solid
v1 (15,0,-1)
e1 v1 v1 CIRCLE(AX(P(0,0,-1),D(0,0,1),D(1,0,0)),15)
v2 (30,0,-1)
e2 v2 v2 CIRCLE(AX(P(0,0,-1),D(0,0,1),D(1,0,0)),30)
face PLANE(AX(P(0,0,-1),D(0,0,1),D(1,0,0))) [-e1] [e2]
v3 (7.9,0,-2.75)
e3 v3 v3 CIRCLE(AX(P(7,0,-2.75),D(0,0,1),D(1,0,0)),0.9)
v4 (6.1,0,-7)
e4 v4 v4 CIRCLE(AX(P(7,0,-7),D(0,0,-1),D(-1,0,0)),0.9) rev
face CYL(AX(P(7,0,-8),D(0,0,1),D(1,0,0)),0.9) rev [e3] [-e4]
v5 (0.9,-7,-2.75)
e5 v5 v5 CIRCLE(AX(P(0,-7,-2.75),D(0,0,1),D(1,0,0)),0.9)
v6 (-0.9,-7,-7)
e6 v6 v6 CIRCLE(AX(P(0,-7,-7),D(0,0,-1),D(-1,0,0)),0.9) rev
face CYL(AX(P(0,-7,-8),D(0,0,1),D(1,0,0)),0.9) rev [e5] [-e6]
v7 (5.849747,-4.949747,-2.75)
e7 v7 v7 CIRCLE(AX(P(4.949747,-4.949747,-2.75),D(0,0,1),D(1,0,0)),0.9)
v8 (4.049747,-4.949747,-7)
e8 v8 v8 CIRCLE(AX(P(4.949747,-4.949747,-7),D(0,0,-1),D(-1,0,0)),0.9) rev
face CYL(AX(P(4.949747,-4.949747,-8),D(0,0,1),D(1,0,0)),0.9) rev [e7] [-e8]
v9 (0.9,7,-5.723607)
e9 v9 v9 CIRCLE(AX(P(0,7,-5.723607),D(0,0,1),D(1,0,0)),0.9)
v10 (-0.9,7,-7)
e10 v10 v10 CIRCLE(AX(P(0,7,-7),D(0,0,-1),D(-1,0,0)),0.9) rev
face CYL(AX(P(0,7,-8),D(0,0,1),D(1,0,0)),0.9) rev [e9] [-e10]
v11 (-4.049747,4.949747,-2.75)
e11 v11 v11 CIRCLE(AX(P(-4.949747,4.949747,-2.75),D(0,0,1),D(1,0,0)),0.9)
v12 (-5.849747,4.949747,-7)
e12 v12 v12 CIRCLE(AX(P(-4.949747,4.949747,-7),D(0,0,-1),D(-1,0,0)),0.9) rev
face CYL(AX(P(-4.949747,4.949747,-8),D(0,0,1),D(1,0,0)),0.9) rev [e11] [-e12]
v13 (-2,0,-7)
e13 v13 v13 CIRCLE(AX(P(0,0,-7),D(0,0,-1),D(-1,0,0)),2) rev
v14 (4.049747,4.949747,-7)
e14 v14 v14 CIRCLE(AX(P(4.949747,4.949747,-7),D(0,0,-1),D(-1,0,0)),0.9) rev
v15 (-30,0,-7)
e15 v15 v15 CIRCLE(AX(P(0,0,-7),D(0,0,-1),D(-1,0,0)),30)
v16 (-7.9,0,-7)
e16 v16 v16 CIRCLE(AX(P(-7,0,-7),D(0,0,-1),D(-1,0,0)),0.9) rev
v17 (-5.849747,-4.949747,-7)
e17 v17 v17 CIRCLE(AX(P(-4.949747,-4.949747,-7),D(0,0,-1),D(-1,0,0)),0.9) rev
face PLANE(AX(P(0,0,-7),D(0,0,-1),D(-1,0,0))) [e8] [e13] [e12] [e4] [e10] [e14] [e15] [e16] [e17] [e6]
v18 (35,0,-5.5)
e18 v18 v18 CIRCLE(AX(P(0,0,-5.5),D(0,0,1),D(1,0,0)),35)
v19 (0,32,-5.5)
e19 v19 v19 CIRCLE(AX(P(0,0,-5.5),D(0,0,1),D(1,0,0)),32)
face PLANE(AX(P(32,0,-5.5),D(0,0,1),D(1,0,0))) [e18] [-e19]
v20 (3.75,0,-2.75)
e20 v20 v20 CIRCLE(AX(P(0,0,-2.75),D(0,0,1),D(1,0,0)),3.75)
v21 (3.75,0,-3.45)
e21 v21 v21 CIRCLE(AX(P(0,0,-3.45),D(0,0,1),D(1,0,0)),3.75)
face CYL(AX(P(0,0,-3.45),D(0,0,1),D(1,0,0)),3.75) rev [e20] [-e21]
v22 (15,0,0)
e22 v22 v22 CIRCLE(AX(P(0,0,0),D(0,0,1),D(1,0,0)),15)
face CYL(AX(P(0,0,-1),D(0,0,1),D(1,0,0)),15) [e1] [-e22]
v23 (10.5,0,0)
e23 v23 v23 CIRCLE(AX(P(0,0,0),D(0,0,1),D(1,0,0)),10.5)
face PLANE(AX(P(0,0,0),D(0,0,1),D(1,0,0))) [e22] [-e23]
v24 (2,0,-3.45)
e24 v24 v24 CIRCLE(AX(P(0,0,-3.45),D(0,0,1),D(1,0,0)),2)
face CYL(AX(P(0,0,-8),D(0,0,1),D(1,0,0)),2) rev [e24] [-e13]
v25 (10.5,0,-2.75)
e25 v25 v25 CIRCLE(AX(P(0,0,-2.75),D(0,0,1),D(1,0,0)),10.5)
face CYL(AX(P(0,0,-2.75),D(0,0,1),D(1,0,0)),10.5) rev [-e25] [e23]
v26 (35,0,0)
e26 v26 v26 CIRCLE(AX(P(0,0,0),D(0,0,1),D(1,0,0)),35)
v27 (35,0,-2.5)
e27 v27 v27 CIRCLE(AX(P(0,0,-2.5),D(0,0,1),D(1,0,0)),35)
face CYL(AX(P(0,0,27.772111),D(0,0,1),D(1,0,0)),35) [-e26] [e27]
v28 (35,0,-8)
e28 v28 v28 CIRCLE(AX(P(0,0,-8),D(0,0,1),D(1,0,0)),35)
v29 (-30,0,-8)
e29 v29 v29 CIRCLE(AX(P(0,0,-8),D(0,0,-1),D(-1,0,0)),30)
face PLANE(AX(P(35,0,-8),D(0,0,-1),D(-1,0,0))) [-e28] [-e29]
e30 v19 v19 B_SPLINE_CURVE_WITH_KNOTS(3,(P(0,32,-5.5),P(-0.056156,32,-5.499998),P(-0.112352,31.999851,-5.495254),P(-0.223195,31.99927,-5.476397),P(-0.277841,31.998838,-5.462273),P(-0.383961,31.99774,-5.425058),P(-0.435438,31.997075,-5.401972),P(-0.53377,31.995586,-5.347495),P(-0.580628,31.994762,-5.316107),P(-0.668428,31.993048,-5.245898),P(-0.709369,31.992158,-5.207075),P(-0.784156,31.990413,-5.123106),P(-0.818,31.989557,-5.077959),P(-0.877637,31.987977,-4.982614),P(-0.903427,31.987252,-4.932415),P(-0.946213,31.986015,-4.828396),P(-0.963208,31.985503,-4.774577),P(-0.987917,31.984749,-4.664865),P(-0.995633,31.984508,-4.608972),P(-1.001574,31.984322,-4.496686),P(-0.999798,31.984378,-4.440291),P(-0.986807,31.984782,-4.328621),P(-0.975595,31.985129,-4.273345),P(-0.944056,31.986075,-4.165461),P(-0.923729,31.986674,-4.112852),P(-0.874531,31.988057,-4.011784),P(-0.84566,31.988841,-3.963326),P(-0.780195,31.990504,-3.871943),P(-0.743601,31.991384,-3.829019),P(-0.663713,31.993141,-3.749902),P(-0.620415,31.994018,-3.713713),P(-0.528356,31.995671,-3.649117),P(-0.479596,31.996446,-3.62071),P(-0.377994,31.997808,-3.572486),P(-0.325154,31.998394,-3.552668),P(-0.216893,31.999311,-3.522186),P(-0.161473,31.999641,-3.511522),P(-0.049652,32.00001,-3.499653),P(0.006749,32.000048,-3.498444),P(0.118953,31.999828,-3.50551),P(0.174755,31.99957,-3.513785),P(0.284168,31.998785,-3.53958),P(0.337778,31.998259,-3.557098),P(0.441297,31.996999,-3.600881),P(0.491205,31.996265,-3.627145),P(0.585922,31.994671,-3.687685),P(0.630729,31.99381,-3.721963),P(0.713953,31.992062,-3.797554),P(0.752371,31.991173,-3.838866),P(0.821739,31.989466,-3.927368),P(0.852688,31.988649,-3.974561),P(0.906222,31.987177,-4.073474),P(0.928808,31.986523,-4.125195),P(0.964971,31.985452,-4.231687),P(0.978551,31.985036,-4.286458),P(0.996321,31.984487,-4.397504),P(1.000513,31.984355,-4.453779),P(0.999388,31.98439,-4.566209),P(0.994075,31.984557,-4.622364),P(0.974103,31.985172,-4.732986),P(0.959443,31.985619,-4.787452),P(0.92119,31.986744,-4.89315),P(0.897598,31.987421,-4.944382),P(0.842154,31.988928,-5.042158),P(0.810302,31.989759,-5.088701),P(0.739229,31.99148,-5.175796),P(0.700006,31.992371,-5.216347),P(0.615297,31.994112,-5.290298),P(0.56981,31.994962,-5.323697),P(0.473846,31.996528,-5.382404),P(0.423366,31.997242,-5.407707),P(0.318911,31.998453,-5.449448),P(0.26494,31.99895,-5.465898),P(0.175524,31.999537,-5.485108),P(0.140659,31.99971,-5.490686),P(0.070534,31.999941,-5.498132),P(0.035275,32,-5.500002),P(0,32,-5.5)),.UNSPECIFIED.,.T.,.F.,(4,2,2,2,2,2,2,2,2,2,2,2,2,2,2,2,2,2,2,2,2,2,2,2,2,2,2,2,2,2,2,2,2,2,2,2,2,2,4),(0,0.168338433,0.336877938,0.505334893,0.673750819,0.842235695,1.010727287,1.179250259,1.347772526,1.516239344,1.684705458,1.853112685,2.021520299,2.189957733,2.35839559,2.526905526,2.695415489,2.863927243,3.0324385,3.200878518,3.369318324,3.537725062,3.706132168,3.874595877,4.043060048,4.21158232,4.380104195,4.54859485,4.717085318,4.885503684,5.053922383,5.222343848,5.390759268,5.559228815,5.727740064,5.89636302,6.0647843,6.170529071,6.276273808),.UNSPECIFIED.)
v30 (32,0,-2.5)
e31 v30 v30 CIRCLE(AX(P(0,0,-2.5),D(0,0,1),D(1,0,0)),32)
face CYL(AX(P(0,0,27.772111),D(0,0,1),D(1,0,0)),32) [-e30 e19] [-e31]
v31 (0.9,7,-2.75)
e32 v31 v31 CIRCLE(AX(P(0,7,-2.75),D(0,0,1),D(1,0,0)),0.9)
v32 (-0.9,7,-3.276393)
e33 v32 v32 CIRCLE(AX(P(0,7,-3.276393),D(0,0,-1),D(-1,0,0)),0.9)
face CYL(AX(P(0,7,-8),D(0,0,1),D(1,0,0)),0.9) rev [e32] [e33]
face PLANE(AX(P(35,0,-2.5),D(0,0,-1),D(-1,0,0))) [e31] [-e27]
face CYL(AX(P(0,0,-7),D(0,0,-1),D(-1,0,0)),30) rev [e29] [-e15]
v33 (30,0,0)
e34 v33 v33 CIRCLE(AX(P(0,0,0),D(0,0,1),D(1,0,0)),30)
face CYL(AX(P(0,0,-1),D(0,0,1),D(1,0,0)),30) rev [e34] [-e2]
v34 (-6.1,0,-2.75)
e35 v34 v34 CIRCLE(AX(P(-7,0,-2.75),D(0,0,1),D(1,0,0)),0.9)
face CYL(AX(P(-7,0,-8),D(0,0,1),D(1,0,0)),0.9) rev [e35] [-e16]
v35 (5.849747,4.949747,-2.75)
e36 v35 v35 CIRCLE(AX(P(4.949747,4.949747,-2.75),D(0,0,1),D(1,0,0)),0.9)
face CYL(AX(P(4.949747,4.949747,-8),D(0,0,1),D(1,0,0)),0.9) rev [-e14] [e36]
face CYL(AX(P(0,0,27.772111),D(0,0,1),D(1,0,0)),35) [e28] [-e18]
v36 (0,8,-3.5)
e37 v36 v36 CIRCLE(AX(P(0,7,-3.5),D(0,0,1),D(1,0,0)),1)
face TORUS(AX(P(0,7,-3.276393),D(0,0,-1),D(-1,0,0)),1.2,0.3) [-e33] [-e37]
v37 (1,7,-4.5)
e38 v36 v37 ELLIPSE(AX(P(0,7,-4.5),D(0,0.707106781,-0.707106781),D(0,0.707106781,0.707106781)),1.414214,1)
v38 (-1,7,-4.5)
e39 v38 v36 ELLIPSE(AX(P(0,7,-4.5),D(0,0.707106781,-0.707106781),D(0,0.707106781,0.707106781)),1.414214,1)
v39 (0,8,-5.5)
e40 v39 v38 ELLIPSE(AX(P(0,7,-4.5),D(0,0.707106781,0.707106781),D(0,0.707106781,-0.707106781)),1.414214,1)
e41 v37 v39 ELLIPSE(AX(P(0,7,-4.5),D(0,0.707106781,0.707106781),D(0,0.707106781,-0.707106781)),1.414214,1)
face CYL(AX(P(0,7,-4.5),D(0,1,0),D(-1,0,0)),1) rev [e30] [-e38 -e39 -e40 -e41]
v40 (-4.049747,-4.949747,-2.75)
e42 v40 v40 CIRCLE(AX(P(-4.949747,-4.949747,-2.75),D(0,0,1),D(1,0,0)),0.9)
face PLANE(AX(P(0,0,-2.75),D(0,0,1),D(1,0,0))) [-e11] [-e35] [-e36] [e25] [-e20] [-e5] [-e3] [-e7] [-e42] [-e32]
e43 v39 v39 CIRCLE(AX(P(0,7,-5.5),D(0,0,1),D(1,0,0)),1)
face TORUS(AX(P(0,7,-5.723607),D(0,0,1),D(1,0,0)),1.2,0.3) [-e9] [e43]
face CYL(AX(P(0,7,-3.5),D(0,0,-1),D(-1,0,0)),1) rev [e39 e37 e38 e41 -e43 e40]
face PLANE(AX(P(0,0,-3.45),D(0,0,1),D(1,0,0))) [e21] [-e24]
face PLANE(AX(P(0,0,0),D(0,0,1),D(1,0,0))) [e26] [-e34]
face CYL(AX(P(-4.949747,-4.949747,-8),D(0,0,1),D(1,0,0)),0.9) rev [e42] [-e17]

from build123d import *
from build123d.topology import SkipClean

# Parameters (mm, degrees)
SKETCH4_R              = 10.5
CUT_EXTRUDE2_DEPTH     = 2.75
SKETCH5_R              = 3.75
CUT_EXTRUDE3_DEPTH     = 0.7
SKETCH6_R              = 0.9
CUT_EXTRUDE4_DEPTH     = 50.775119287
SKETCH11_R             = 2
CUT_EXTRUDE8_DEPTH     = 50.70616159
CUT_EXTRUDE9_START     = -25
CUT_EXTRUDE9_OUTLINE_R = 1
CUT_EXTRUDE9_DEPTH     = 26
SKETCH18_R             = 30
CUT_EXTRUDE12_DEPTH    = 1
CUT_EXTRUDE13_START    = -1
SKETCH19_R             = 30
SKETCH19_R_2           = 15
CUT_EXTRUDE13_DEPTH    = 1


with BuildPart() as part:
    # Sketch2 → Revolve1 (revolve)
    with BuildSketch(Plane(origin=(0, 0, 0), x_dir=(1, 0, 0), z_dir=(0, 1, 0))):
        Polygon((0, 0), (35, 0), (35, 2.5), (32, 2.5), (32, 5.5), (35, 5.5), (35, 8), (0, 8), align=None)
    revolve(axis=Axis((0, 0, 27.772111005), (0, 0, -1)))

    # Sketch4 → Cut-Extrude2 (cut)
    with BuildSketch(Plane.XY):
        Circle(SKETCH4_R)
    extrude(amount=-CUT_EXTRUDE2_DEPTH, mode=Mode.SUBTRACT)

    # Sketch5 → Cut-Extrude3 (cut)
    with BuildSketch(Plane.XY.offset(-2.75)):
        Circle(SKETCH5_R)
    extrude(amount=-CUT_EXTRUDE3_DEPTH, mode=Mode.SUBTRACT)

    # Sketch6 → Cut-Extrude4 (cut, through all)
    with BuildSketch(Plane.XY.offset(-2.75)):
        with Locations((0, 7)):
            Circle(SKETCH6_R)
        with Locations((4.949747468, 4.949747468)):
            Circle(SKETCH6_R)
        with Locations((7, 0)):
            Circle(SKETCH6_R)
        with Locations((4.949747468, -4.949747468)):
            Circle(SKETCH6_R)
        with Locations((0, -7)):
            Circle(SKETCH6_R)
        with Locations((-4.949747468, -4.949747468)):
            Circle(SKETCH6_R)
        with Locations((-7, 0)):
            Circle(SKETCH6_R)
        with Locations((-4.949747468, 4.949747468)):
            Circle(SKETCH6_R)
    extrude(amount=-CUT_EXTRUDE4_DEPTH, mode=Mode.SUBTRACT)

    # Sketch11 → Cut-Extrude8 (cut, through all)
    with BuildSketch(Plane.XY.offset(-3.45)):
        Circle(SKETCH11_R)
    extrude(amount=-CUT_EXTRUDE8_DEPTH, mode=Mode.SUBTRACT)

    # Cut-Extrude9: read off the stored shape, not the designer's step
    # Cut-Extrude9 outline → Cut-Extrude9 (cut)
    with BuildSketch(Plane(origin=(0, 32, 0), x_dir=(1, 0, 0), z_dir=(0, 1, 0)).offset(CUT_EXTRUDE9_START)):
        with Locations((0, 4.5)):
            Circle(CUT_EXTRUDE9_OUTLINE_R)
    extrude(amount=CUT_EXTRUDE9_DEPTH, mode=Mode.SUBTRACT)

    # Fillet4: read off the stored shape, not the designer's step
    # Fillet4 outline → Fillet4 (revolve, cut)
    with SkipClean():  # the faces are left unmerged after this step: merging them gives an invalid solid
        with BuildSketch(Plane.XZ.offset(-7)):
            with BuildLine():
                Line((1, -5.5), (1, -3.5))
                ThreePointArc((1, -3.5), (0.926138721, -3.398867689), (0.9, -3.276393202))
                Line((0.9, -3.276393202), (0.9, -5.723606798))
                ThreePointArc((0.9, -5.723606798), (0.926138721, -5.601132311), (1, -5.5))
            make_face()
        revolve(axis=Axis((0, 7, 0), (0, 0, 1)), mode=Mode.SUBTRACT)

    # Sketch18 → Cut-Extrude12 (cut)
    with SkipClean():  # the faces are left unmerged after this step: merging them gives an invalid solid
        with BuildSketch(Plane(origin=(0, 0, -8), x_dir=(-1, 0, 0), z_dir=(0, 0, -1))):
            Circle(SKETCH18_R)
        extrude(amount=-CUT_EXTRUDE12_DEPTH, mode=Mode.SUBTRACT)

    # Sketch19 → Cut-Extrude13 (cut)
    with SkipClean():  # the faces are left unmerged after this step: merging them gives an invalid solid
        with BuildSketch(Plane.XY.offset(CUT_EXTRUDE13_START)):
            with Locations(Location((0, 0, 0), (0, 0, 180))):
                Circle(SKETCH19_R)
            Circle(SKETCH19_R_2, mode=Mode.SUBTRACT)
        extrude(amount=CUT_EXTRUDE13_DEPTH, mode=Mode.SUBTRACT)


solid = part.part
